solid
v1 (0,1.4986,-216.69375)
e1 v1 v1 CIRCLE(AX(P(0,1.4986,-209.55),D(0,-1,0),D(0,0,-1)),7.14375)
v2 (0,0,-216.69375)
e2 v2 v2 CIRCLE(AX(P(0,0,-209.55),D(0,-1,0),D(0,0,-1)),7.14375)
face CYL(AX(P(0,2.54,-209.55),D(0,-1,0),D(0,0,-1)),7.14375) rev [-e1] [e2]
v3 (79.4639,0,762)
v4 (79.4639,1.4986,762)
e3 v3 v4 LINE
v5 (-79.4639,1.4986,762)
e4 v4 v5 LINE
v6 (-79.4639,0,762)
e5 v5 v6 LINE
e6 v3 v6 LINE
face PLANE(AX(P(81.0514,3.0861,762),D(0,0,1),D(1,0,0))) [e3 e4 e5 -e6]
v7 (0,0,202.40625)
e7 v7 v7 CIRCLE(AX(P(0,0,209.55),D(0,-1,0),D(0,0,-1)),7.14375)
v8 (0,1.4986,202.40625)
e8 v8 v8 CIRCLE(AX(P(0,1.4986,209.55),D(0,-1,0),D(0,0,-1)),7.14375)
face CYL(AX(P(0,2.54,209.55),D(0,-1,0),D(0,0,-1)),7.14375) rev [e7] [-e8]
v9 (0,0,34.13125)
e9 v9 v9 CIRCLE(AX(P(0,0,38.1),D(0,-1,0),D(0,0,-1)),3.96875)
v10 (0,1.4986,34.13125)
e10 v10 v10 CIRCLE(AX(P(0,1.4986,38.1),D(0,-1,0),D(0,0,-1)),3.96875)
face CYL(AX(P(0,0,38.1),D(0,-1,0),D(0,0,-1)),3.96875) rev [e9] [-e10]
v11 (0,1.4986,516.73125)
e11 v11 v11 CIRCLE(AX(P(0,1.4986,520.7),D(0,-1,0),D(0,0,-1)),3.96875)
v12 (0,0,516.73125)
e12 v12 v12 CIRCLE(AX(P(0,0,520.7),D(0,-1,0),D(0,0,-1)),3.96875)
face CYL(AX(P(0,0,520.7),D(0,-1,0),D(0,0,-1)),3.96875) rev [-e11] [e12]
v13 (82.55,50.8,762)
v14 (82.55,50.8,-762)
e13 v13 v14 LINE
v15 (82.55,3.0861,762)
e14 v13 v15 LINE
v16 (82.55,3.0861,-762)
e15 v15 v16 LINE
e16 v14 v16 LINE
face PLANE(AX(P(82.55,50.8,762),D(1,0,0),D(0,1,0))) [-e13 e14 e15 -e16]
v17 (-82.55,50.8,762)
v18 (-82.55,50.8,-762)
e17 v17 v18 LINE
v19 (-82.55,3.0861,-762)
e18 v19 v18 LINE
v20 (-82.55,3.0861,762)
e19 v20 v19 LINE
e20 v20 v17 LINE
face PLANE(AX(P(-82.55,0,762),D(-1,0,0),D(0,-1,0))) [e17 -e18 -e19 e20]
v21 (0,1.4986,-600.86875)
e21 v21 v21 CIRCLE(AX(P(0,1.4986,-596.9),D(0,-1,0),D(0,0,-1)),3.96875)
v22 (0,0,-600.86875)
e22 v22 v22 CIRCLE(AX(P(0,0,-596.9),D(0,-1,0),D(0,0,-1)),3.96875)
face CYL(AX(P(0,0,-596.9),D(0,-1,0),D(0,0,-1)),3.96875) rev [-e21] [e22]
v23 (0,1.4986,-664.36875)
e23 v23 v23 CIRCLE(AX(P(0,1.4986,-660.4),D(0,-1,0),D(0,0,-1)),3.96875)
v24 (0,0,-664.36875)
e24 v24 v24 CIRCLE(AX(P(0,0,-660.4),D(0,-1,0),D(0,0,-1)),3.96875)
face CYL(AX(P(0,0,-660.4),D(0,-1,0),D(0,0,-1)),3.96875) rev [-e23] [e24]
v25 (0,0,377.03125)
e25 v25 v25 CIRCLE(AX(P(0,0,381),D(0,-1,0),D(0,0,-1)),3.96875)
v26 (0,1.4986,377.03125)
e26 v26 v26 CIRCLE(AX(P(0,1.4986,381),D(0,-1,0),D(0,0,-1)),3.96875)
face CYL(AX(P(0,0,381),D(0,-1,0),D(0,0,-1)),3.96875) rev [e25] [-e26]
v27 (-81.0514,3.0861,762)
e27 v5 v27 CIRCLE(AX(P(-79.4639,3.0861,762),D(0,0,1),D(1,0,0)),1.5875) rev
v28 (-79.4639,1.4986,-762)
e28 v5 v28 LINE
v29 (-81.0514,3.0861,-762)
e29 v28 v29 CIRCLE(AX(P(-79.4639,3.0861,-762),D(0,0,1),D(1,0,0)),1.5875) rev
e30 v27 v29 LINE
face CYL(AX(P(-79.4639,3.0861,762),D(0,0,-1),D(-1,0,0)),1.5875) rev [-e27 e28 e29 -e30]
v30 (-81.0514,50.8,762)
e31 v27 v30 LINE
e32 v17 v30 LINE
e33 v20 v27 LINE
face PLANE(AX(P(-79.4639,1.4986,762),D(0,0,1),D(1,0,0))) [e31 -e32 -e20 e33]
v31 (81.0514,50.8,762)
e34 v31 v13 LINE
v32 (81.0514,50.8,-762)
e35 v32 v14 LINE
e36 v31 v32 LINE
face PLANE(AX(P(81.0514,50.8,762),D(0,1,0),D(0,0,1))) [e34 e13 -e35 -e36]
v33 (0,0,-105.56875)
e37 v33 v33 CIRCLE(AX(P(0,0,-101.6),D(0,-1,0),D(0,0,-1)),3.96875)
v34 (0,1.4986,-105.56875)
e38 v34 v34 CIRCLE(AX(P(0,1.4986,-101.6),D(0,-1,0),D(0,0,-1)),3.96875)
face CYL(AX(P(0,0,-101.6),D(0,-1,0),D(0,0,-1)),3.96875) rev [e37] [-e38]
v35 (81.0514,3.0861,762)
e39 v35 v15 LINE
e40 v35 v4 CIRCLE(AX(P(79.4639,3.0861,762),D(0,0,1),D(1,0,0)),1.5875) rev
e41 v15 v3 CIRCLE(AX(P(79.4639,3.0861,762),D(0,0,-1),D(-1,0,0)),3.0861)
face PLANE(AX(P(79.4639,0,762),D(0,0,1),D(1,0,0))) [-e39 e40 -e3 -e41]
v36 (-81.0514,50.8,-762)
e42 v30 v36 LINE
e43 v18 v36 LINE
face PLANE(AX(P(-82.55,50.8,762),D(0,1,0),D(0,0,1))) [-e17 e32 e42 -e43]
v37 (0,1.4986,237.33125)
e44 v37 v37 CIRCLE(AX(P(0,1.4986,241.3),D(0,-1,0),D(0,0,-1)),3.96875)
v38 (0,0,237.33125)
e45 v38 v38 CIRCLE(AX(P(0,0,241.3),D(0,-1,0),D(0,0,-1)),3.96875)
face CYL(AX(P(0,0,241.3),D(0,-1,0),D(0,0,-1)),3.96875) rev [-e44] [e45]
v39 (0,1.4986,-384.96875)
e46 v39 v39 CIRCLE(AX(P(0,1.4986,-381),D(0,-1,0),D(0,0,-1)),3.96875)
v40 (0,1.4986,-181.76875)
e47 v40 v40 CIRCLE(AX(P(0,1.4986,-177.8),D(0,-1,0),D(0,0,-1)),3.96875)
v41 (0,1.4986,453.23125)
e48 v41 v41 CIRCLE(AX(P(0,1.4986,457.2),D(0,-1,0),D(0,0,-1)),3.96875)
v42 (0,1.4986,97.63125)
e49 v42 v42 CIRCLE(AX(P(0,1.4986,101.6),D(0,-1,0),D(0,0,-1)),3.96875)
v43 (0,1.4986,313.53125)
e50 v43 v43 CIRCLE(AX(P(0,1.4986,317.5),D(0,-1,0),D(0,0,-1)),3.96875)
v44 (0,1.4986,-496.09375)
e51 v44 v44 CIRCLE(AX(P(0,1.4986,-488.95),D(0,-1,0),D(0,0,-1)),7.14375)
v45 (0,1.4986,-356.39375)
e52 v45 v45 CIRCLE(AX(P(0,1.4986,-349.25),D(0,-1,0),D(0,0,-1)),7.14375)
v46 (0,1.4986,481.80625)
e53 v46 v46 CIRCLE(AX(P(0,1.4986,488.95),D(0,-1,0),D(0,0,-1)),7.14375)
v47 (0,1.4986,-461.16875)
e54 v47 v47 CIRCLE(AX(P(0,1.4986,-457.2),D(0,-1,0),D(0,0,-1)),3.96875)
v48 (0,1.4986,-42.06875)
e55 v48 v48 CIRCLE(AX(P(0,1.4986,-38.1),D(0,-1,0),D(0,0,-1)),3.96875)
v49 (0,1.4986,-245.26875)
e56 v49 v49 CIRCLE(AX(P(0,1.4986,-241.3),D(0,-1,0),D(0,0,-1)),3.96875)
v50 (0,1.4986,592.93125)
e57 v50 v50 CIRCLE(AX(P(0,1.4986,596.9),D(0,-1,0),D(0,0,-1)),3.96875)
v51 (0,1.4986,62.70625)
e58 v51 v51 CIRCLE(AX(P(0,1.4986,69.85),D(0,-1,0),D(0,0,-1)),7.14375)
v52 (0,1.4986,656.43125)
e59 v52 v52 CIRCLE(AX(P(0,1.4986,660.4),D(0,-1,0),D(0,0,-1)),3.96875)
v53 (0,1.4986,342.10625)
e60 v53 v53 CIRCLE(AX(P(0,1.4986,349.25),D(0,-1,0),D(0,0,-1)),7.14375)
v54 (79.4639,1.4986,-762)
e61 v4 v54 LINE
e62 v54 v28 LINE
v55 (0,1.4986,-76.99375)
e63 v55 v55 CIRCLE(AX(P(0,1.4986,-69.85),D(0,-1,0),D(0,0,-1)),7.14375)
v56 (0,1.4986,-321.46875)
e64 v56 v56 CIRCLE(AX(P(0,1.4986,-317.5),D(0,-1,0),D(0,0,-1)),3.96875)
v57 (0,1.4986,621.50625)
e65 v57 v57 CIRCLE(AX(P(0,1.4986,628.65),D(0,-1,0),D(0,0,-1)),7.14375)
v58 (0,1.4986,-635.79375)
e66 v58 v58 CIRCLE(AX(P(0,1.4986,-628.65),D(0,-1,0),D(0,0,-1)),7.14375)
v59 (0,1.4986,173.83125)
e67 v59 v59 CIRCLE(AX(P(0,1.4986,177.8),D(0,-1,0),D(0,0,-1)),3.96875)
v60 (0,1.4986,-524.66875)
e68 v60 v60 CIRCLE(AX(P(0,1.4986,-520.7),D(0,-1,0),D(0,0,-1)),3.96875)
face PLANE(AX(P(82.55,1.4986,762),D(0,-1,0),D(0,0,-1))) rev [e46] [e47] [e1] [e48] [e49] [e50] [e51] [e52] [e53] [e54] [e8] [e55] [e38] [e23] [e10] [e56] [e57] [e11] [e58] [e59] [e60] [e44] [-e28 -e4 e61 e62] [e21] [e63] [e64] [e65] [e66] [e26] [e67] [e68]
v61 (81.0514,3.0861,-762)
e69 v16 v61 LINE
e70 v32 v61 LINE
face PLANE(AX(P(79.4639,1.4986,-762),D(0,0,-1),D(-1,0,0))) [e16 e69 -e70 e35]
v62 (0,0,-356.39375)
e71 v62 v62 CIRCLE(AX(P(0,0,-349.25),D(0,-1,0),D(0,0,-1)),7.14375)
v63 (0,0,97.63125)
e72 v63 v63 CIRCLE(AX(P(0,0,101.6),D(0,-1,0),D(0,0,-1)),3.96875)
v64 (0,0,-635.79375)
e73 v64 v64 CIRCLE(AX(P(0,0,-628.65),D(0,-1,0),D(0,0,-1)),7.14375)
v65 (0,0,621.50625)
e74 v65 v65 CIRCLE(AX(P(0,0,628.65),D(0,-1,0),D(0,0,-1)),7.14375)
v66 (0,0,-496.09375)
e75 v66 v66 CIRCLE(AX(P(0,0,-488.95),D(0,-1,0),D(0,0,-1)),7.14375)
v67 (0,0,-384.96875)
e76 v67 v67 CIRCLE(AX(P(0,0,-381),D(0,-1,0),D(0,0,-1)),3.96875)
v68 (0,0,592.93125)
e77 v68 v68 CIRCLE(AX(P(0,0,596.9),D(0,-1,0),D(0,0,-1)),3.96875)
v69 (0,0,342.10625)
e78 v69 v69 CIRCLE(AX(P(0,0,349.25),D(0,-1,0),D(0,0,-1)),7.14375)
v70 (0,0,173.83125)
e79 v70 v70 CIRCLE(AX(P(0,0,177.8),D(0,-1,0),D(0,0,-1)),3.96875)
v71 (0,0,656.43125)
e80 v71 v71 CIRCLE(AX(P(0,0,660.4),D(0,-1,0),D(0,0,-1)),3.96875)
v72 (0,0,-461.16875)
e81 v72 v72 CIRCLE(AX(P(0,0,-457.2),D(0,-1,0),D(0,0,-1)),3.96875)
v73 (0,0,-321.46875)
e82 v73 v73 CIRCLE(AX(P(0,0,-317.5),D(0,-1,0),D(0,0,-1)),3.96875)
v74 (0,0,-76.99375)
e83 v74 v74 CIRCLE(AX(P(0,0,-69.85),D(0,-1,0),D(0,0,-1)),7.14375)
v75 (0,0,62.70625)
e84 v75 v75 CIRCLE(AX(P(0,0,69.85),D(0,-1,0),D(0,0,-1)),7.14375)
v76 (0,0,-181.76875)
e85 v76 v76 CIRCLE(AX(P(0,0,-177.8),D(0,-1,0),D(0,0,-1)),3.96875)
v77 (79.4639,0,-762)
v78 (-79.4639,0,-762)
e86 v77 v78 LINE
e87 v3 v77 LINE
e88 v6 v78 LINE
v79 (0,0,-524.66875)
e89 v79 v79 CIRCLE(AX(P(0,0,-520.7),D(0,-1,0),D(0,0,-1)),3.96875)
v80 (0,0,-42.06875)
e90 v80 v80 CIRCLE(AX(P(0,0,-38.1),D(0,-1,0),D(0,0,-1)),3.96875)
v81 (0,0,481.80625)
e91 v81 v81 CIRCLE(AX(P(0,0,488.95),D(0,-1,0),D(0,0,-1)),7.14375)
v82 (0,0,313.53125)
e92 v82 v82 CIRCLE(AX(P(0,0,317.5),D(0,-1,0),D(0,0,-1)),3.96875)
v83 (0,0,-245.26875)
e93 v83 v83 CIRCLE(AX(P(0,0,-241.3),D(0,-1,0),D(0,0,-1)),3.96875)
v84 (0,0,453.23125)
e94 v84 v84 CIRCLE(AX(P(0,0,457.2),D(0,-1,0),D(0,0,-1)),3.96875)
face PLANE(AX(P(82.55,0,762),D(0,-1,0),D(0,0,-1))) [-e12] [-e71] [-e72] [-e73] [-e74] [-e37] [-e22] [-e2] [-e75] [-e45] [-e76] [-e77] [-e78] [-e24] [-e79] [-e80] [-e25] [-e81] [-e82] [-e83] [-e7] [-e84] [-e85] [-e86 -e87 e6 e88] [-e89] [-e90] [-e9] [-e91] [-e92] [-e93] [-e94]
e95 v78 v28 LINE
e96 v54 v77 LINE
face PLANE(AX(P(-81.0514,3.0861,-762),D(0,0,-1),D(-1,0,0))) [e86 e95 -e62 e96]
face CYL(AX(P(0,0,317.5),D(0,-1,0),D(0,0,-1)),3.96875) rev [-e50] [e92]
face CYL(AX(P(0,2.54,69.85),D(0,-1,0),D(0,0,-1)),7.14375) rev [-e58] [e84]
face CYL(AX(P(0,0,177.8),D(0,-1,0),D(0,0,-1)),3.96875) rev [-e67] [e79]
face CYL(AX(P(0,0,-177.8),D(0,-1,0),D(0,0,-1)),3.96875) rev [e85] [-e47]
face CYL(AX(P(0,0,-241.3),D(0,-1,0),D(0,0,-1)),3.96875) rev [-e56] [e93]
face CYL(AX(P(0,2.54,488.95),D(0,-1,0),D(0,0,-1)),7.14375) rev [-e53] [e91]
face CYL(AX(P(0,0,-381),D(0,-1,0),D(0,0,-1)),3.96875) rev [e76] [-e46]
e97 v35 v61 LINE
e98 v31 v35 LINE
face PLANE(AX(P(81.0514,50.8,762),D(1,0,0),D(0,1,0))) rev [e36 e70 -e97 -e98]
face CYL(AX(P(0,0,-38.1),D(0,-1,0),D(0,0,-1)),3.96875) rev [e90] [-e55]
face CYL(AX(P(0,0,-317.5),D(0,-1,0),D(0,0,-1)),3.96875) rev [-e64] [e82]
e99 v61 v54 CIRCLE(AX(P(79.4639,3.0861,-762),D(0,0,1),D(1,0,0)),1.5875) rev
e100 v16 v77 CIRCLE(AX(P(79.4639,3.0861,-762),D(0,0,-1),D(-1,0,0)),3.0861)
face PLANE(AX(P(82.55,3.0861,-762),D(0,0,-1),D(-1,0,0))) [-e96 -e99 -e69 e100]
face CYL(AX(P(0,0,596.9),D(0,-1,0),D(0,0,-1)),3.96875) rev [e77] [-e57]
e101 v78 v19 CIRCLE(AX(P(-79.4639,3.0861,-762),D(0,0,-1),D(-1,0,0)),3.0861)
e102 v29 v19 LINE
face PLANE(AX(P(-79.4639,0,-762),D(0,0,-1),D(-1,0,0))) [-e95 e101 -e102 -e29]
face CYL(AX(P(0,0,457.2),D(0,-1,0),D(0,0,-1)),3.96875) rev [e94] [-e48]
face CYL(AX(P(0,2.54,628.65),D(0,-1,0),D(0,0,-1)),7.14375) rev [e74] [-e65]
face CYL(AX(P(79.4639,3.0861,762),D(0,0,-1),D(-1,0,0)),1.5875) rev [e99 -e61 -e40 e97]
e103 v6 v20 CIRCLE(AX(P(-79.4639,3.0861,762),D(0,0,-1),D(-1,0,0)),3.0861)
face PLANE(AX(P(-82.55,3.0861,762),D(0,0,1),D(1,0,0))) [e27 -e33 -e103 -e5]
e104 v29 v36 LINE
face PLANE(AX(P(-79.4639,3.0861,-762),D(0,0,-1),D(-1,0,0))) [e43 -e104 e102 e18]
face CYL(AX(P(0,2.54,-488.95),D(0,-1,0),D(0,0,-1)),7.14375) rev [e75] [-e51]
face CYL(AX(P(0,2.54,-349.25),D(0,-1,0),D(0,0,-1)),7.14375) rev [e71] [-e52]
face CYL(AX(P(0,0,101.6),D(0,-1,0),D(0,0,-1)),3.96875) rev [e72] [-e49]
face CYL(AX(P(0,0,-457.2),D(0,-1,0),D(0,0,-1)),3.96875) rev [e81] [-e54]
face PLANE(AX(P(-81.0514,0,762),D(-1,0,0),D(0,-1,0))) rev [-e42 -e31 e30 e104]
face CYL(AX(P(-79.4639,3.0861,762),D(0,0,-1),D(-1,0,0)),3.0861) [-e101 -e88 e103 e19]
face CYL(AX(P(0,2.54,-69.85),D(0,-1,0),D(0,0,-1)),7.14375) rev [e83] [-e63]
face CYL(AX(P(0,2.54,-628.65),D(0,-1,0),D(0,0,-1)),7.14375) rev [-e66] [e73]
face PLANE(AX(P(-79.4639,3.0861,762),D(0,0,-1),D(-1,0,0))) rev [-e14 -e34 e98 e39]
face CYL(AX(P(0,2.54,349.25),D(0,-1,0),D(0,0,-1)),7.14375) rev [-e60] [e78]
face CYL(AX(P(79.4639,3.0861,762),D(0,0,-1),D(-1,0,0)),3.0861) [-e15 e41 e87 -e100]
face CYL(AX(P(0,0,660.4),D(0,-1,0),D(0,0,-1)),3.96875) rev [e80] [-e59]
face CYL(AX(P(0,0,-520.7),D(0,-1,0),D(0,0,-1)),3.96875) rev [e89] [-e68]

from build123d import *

# Parameters (mm, degrees)
BASE_FLANGE1_DEPTH             = 762
HOLE1_OUTLINE_R                = 7.14375
HOLE1_DEPTH                    = 1.4986
LPATTERN1_COUNT                = 10
LPATTERN1_PITCH                = 139.7
F_5_16_0_3125_DIAMETER_HOLE1_D = 7.9375
LPATTERN2_COUNT                = 10
LPATTERN2_PITCH                = 139.7


# Read off the part's stored shape, not the designer's step: Hole1
# Sheet-metal steps are written as plain solids
with BuildPart() as part:
    # Sketch1 → Base-Flange1 (new, symmetric)
    with BuildSketch(Plane.XY):
        with BuildLine():
            Line((82.55, 50.8), (82.55, 3.0861))
            ThreePointArc((82.55, 3.0861), (81.646102237, 0.903897763), (79.4639, 0))
            Line((79.4639, 0), (-79.4639, 0))
            ThreePointArc((-79.4639, 0), (-81.646102237, 0.903897763), (-82.55, 3.0861))
            Line((-82.55, 3.0861), (-82.55, 50.8))
            Line((-82.55, 50.8), (-81.0514, 50.8))
            Line((-81.0514, 50.8), (-81.0514, 3.0861))
            ThreePointArc((-81.0514, 3.0861), (-80.586432015, 1.963567985), (-79.4639, 1.4986))
            Line((-79.4639, 1.4986), (79.4639, 1.4986))
            ThreePointArc((79.4639, 1.4986), (80.586432015, 1.963567985), (81.0514, 3.0861))
            Line((81.0514, 3.0861), (81.0514, 50.8))
            Line((81.0514, 50.8), (82.55, 50.8))
        make_face()
    extrude(amount=BASE_FLANGE1_DEPTH, both=True)

    # Hole1 outline → Hole1 (cut)
    with BuildSketch(Plane(origin=(0, 0, 0), x_dir=(1, 0, 0), z_dir=(0, 1, 0))):
        with Locations((0, 628.65)):
            Circle(HOLE1_OUTLINE_R)
    hole1 = extrude(amount=HOLE1_DEPTH, mode=Mode.SUBTRACT)

    # LPattern1: Hole1 ×10
    with Locations(*[(0, 0, i * LPATTERN1_PITCH) for i in range(1, LPATTERN1_COUNT)]):
        add(hole1, mode=Mode.SUBTRACT)

    # 5/16 (0.3125) Diameter Hole1 (through all)
    with Locations(Plane(origin=(0, 0, 0), x_dir=(-1, 0, 0), z_dir=(0, -1, 0))):
        with Locations((0, 660.4), (0, 596.9)):
            f_5_16_0_3125_diameter_hole1 = Hole(F_5_16_0_3125_DIAMETER_HOLE1_D / 2)

    # LPattern2: 5/16 (0.3125) Diameter Hole1 ×10
    with Locations(*[(0, 0, i * LPATTERN2_PITCH) for i in range(1, LPATTERN2_COUNT)]):
        add(f_5_16_0_3125_diameter_hole1, mode=Mode.SUBTRACT)


solid = part.part
